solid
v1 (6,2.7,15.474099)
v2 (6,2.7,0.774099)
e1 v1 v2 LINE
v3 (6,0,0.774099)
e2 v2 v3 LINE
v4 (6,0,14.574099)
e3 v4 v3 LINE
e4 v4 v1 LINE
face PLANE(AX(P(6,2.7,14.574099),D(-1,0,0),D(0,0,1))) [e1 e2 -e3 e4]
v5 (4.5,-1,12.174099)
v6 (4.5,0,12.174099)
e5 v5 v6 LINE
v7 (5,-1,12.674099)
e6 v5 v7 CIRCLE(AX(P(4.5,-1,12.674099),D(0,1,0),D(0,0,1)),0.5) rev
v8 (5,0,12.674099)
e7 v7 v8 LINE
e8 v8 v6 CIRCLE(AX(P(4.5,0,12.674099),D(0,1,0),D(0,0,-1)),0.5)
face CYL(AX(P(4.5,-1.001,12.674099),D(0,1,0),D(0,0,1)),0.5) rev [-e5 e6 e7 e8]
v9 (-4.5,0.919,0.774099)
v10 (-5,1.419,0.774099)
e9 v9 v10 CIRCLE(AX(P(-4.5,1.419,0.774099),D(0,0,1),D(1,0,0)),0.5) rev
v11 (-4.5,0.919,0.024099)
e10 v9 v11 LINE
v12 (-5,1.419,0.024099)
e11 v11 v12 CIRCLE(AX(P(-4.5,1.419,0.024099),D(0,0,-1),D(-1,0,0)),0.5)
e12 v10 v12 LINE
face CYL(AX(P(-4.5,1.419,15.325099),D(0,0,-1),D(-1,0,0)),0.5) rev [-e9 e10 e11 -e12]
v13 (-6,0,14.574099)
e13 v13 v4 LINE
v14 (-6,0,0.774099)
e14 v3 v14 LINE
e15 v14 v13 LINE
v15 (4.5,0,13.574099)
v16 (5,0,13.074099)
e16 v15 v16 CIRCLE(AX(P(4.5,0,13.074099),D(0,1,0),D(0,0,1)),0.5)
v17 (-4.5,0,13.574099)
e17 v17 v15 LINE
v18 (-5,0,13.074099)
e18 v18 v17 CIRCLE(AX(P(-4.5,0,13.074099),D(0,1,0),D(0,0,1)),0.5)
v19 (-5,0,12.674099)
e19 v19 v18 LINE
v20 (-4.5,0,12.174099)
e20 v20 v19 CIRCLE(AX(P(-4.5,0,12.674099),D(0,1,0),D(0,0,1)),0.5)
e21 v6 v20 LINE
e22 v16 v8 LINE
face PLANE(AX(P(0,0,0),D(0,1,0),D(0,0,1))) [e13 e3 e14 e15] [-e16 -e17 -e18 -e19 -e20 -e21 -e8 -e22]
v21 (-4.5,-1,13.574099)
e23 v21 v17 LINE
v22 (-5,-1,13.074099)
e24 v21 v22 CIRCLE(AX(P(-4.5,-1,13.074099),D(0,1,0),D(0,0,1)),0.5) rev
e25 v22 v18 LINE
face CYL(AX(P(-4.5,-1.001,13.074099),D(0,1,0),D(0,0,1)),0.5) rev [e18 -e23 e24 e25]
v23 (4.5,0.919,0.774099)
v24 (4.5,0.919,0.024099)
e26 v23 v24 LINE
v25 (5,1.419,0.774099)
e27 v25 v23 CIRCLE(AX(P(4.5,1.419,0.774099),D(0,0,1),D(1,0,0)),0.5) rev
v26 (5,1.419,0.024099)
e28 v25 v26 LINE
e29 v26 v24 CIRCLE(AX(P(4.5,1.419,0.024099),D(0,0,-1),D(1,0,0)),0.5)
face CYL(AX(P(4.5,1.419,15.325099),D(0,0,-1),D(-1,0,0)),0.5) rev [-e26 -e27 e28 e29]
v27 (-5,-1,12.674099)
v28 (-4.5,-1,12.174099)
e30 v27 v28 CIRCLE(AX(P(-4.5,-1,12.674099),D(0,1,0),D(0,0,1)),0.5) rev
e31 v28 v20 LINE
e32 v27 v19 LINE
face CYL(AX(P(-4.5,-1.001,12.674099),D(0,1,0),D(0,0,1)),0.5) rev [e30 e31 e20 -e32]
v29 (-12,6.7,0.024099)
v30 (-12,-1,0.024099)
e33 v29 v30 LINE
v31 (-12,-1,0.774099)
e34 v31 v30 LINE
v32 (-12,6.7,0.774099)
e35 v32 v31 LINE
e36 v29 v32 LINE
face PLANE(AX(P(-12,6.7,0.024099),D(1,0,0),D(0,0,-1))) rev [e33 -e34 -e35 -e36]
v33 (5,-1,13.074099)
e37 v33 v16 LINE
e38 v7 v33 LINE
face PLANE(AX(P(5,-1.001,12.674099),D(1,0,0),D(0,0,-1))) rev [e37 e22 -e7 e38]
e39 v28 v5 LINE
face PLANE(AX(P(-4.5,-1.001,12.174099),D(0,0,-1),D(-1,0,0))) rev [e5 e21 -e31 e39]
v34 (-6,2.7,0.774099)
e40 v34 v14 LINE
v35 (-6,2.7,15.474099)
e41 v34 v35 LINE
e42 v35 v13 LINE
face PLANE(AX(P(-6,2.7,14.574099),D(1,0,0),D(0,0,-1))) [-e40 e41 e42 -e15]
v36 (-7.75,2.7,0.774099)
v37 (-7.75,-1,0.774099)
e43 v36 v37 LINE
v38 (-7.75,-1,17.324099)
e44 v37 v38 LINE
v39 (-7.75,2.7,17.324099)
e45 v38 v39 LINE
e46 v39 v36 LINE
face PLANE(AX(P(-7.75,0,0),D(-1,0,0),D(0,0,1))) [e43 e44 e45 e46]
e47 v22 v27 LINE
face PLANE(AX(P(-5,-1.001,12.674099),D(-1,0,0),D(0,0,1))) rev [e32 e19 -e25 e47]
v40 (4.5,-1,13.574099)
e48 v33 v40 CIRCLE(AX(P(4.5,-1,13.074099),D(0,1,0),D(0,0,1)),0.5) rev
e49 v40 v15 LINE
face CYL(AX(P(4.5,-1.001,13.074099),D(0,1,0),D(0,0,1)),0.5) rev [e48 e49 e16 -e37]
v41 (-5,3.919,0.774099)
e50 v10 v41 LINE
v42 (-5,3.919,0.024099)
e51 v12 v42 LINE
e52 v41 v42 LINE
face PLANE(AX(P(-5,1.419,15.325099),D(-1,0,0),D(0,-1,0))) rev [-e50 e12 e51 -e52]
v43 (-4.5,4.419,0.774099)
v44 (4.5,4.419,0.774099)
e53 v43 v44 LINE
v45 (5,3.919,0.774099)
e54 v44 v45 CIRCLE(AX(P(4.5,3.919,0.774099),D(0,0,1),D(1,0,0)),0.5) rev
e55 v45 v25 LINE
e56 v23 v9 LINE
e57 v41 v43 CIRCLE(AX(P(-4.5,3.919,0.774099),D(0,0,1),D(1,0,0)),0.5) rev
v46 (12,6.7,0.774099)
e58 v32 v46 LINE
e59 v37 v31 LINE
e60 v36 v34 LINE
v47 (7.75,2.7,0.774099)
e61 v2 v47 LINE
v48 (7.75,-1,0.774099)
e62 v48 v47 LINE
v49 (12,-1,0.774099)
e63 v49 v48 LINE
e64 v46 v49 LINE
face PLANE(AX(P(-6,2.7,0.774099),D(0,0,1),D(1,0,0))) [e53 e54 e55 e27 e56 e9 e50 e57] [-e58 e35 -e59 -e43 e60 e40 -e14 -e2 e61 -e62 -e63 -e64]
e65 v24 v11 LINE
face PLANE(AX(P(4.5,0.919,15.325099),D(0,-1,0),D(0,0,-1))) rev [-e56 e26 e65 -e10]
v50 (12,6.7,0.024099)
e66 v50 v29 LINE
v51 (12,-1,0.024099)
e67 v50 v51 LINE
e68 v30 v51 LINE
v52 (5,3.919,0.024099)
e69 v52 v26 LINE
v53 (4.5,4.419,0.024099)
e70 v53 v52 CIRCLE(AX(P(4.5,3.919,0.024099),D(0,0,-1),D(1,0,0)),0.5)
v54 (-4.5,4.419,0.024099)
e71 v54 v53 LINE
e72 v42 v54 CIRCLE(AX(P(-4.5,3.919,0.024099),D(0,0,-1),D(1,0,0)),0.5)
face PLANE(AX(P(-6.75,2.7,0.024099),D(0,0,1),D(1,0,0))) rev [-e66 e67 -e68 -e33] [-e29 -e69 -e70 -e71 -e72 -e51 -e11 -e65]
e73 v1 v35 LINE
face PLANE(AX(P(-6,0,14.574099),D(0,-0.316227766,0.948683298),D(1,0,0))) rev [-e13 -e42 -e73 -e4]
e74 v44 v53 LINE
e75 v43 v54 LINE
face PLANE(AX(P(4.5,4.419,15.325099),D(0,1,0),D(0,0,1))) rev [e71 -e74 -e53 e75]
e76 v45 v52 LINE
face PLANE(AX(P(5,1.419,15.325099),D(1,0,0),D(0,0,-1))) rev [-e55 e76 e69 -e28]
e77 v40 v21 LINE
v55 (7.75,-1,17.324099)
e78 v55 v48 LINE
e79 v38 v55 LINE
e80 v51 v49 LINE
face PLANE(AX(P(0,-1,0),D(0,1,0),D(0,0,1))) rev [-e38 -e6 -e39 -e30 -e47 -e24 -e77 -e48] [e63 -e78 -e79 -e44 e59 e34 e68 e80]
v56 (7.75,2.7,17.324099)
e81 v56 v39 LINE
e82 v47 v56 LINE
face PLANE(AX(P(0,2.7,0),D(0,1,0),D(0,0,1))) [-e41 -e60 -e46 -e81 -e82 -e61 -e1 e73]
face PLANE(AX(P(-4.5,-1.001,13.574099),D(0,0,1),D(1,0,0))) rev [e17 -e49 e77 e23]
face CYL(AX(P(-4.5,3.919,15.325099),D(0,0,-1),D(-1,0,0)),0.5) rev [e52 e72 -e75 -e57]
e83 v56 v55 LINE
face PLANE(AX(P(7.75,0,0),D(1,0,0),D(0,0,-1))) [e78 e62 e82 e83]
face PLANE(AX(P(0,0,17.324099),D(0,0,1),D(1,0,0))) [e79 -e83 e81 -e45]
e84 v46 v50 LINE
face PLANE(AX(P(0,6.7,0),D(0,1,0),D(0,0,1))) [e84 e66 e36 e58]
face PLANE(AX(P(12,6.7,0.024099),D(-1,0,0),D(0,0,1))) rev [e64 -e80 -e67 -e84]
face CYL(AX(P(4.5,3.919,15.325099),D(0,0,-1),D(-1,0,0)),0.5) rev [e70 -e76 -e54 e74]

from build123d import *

# Parameters (mm, degrees)
SKETCH4_W           = 13.5
SKETCH4_H           = 15.3
SKETCH4_W_2         = 12
SKETCH4_H_2         = 13.8
BOSS_EXTRUDE1_DEPTH = 2.7
SKETCH5_W           = 13.5
SKETCH5_H           = 15.3
BOSS_EXTRUDE2_DEPTH = 1
SKETCH6_W           = 24
SKETCH6_H           = 0.75
BOSS_EXTRUDE3_DEPTH = 4
CUT_EXTRUDE1_REACH  = 22.566
SKETCH8_W           = 5.25
SKETCH8_H           = 0.75
BOSS_EXTRUDE4_DEPTH = 3.7
SKETCH9_W           = 5.25
SKETCH9_H           = 0.75
BOSS_EXTRUDE5_DEPTH = 3.7
SKETCH10_W          = 13.5
SKETCH10_H          = 3.7
BOSS_EXTRUDE6_DEPTH = 2
CHAMFER1_SIZE       = 2.7
CHAMFER1_SIZE_2     = 0.9
SKETCH11_W          = 16.55
SKETCH11_H          = 3.7
BOSS_EXTRUDE7_DEPTH = 1
SKETCH12_W          = 16.55
SKETCH12_H          = 3.7
BOSS_EXTRUDE8_DEPTH = 1
CUT_EXTRUDE2_REACH  = 24.114


with BuildPart() as part:
    # Sketch4 → Boss-Extrude1 (new body)
    with BuildSketch(Plane(origin=(0, 0, 0), x_dir=(1, 0, 0), z_dir=(0, 1, 0))):
        with Locations((0, -7.674098898)):
            Rectangle(SKETCH4_W, SKETCH4_H)
        with Locations((0, -7.674098898)):
            Rectangle(SKETCH4_W_2, SKETCH4_H_2, mode=Mode.SUBTRACT)
    extrude(amount=BOSS_EXTRUDE1_DEPTH)

    # Sketch5 → Boss-Extrude2 (add)
    with BuildSketch(Plane.XZ):
        with Locations((0, 7.674098898)):
            Rectangle(SKETCH5_W, SKETCH5_H)
    extrude(amount=BOSS_EXTRUDE2_DEPTH)

    # Sketch6 → Boss-Extrude3 (add)
    with BuildSketch(Plane(origin=(0, 2.7, 0), x_dir=(1, 0, 0), z_dir=(0, 1, 0))):
        with Locations((0, -0.399098898)):
            Rectangle(SKETCH6_W, SKETCH6_H)
    extrude(amount=BOSS_EXTRUDE3_DEPTH)

    # Sketch7 → Cut-Extrude1 (cut, up to next)
    with BuildSketch(Plane(origin=(0, 0, 0.024098898), x_dir=(-1, 0, 0), z_dir=(0, 0, -1)), mode=Mode.PRIVATE) as cut_extrude1_sk1:
        with BuildLine():
            Line((-4.5, 0.919), (4.5, 0.919))
            ThreePointArc((4.5, 0.919), (4.853553391, 1.065446609), (5, 1.419))
            Line((5, 1.419), (5, 3.919))
            ThreePointArc((5, 3.919), (4.853553391, 4.272553391), (4.5, 4.419))
            Line((4.5, 4.419), (-4.5, 4.419))
            ThreePointArc((-4.5, 4.419), (-4.853553391, 4.272553391), (-5, 3.919))
            Line((-5, 3.919), (-5, 1.419))
            ThreePointArc((-5, 1.419), (-4.853553391, 1.065446609), (-4.5, 0.919))
        make_face()
    cut_extrude1_tool1 = extrude(cut_extrude1_sk1.sketch, amount=-CUT_EXTRUDE1_REACH, mode=Mode.PRIVATE) & part.part
    add(cut_extrude1_tool1.solids().sort_by_distance((0, 2.669, 0.024099))[0], mode=Mode.SUBTRACT)

    # Sketch8 → Boss-Extrude4 (add)
    with BuildSketch(Plane.XZ.offset(-2.7)):
        with Locations((9.375, 0.399098898)):
            Rectangle(SKETCH8_W, SKETCH8_H)
    extrude(amount=BOSS_EXTRUDE4_DEPTH)

    # Sketch9 → Boss-Extrude5 (add)
    with BuildSketch(Plane.XZ.offset(-2.7)):
        with Locations((-9.375, 0.399098898)):
            Rectangle(SKETCH9_W, SKETCH9_H)
    extrude(amount=BOSS_EXTRUDE5_DEPTH)

    # Sketch10 → Boss-Extrude6 (add)
    with BuildSketch(Plane.XY.offset(15.324098898)):
        with Locations((0, 0.85)):
            Rectangle(SKETCH10_W, SKETCH10_H)
    extrude(amount=BOSS_EXTRUDE6_DEPTH)

    # Chamfer1
    # the kernel refuses this chamfer: 2.7, 0.9 mm, written as the material it takes off along each edge
    with BuildSketch(Plane(origin=(-6, 2.7, 14.574098898), x_dir=(0, -0.9999257509361695, -0.012185754582199112), z_dir=(1, 0, 0))) as chamfer1_piece_1:
        Polygon((CHAMFER1_SIZE * 0.999925750936, -CHAMFER1_SIZE * 0.0121857545822), (-CHAMFER1_SIZE_2 * 0.0121857545822, -CHAMFER1_SIZE_2 * 0.999925750936), (0, 0), align=None)
    extrude(amount=12, mode=Mode.SUBTRACT)

    # Sketch11 → Boss-Extrude7 (add)
    with BuildSketch(Plane(origin=(6.75, 0, 0), x_dir=(0, 0, -1), z_dir=(1, 0, 0))):
        with Locations((-9.049098898, 0.85)):
            Rectangle(SKETCH11_W, SKETCH11_H)
    extrude(amount=BOSS_EXTRUDE7_DEPTH)

    # Sketch12 → Boss-Extrude8 (add)
    with BuildSketch(Plane.ZY.offset(6.75)):
        with Locations((9.049098898, 0.85)):
            Rectangle(SKETCH12_W, SKETCH12_H)
    extrude(amount=BOSS_EXTRUDE8_DEPTH)

    # Sketch13 → Cut-Extrude2 (cut, up to next)
    with BuildSketch(Plane(origin=(0, 0, 0), x_dir=(1, 0, 0), z_dir=(0, 1, 0)), mode=Mode.PRIVATE) as cut_extrude2_sk1:
        with BuildLine():
            Line((-4.5, -12.174098898), (4.5, -12.174098898))
            ThreePointArc((4.5, -12.174098898), (4.853553391, -12.320545507), (5, -12.674098898))
            Line((5, -12.674098898), (5, -13.074098898))
            ThreePointArc((5, -13.074098898), (4.853553391, -13.427652289), (4.5, -13.574098898))
            Line((4.5, -13.574098898), (-4.5, -13.574098898))
            ThreePointArc((-4.5, -13.574098898), (-4.853553391, -13.427652289), (-5, -13.074098898))
            Line((-5, -13.074098898), (-5, -12.674098898))
            ThreePointArc((-5, -12.674098898), (-4.853553391, -12.320545507), (-4.5, -12.174098898))
        make_face()
    cut_extrude2_tool1 = extrude(cut_extrude2_sk1.sketch, amount=-CUT_EXTRUDE2_REACH, mode=Mode.PRIVATE) & part.part
    add(cut_extrude2_tool1.solids().sort_by_distance((0, 0, 12.874099))[0], mode=Mode.SUBTRACT)


solid = part.part
